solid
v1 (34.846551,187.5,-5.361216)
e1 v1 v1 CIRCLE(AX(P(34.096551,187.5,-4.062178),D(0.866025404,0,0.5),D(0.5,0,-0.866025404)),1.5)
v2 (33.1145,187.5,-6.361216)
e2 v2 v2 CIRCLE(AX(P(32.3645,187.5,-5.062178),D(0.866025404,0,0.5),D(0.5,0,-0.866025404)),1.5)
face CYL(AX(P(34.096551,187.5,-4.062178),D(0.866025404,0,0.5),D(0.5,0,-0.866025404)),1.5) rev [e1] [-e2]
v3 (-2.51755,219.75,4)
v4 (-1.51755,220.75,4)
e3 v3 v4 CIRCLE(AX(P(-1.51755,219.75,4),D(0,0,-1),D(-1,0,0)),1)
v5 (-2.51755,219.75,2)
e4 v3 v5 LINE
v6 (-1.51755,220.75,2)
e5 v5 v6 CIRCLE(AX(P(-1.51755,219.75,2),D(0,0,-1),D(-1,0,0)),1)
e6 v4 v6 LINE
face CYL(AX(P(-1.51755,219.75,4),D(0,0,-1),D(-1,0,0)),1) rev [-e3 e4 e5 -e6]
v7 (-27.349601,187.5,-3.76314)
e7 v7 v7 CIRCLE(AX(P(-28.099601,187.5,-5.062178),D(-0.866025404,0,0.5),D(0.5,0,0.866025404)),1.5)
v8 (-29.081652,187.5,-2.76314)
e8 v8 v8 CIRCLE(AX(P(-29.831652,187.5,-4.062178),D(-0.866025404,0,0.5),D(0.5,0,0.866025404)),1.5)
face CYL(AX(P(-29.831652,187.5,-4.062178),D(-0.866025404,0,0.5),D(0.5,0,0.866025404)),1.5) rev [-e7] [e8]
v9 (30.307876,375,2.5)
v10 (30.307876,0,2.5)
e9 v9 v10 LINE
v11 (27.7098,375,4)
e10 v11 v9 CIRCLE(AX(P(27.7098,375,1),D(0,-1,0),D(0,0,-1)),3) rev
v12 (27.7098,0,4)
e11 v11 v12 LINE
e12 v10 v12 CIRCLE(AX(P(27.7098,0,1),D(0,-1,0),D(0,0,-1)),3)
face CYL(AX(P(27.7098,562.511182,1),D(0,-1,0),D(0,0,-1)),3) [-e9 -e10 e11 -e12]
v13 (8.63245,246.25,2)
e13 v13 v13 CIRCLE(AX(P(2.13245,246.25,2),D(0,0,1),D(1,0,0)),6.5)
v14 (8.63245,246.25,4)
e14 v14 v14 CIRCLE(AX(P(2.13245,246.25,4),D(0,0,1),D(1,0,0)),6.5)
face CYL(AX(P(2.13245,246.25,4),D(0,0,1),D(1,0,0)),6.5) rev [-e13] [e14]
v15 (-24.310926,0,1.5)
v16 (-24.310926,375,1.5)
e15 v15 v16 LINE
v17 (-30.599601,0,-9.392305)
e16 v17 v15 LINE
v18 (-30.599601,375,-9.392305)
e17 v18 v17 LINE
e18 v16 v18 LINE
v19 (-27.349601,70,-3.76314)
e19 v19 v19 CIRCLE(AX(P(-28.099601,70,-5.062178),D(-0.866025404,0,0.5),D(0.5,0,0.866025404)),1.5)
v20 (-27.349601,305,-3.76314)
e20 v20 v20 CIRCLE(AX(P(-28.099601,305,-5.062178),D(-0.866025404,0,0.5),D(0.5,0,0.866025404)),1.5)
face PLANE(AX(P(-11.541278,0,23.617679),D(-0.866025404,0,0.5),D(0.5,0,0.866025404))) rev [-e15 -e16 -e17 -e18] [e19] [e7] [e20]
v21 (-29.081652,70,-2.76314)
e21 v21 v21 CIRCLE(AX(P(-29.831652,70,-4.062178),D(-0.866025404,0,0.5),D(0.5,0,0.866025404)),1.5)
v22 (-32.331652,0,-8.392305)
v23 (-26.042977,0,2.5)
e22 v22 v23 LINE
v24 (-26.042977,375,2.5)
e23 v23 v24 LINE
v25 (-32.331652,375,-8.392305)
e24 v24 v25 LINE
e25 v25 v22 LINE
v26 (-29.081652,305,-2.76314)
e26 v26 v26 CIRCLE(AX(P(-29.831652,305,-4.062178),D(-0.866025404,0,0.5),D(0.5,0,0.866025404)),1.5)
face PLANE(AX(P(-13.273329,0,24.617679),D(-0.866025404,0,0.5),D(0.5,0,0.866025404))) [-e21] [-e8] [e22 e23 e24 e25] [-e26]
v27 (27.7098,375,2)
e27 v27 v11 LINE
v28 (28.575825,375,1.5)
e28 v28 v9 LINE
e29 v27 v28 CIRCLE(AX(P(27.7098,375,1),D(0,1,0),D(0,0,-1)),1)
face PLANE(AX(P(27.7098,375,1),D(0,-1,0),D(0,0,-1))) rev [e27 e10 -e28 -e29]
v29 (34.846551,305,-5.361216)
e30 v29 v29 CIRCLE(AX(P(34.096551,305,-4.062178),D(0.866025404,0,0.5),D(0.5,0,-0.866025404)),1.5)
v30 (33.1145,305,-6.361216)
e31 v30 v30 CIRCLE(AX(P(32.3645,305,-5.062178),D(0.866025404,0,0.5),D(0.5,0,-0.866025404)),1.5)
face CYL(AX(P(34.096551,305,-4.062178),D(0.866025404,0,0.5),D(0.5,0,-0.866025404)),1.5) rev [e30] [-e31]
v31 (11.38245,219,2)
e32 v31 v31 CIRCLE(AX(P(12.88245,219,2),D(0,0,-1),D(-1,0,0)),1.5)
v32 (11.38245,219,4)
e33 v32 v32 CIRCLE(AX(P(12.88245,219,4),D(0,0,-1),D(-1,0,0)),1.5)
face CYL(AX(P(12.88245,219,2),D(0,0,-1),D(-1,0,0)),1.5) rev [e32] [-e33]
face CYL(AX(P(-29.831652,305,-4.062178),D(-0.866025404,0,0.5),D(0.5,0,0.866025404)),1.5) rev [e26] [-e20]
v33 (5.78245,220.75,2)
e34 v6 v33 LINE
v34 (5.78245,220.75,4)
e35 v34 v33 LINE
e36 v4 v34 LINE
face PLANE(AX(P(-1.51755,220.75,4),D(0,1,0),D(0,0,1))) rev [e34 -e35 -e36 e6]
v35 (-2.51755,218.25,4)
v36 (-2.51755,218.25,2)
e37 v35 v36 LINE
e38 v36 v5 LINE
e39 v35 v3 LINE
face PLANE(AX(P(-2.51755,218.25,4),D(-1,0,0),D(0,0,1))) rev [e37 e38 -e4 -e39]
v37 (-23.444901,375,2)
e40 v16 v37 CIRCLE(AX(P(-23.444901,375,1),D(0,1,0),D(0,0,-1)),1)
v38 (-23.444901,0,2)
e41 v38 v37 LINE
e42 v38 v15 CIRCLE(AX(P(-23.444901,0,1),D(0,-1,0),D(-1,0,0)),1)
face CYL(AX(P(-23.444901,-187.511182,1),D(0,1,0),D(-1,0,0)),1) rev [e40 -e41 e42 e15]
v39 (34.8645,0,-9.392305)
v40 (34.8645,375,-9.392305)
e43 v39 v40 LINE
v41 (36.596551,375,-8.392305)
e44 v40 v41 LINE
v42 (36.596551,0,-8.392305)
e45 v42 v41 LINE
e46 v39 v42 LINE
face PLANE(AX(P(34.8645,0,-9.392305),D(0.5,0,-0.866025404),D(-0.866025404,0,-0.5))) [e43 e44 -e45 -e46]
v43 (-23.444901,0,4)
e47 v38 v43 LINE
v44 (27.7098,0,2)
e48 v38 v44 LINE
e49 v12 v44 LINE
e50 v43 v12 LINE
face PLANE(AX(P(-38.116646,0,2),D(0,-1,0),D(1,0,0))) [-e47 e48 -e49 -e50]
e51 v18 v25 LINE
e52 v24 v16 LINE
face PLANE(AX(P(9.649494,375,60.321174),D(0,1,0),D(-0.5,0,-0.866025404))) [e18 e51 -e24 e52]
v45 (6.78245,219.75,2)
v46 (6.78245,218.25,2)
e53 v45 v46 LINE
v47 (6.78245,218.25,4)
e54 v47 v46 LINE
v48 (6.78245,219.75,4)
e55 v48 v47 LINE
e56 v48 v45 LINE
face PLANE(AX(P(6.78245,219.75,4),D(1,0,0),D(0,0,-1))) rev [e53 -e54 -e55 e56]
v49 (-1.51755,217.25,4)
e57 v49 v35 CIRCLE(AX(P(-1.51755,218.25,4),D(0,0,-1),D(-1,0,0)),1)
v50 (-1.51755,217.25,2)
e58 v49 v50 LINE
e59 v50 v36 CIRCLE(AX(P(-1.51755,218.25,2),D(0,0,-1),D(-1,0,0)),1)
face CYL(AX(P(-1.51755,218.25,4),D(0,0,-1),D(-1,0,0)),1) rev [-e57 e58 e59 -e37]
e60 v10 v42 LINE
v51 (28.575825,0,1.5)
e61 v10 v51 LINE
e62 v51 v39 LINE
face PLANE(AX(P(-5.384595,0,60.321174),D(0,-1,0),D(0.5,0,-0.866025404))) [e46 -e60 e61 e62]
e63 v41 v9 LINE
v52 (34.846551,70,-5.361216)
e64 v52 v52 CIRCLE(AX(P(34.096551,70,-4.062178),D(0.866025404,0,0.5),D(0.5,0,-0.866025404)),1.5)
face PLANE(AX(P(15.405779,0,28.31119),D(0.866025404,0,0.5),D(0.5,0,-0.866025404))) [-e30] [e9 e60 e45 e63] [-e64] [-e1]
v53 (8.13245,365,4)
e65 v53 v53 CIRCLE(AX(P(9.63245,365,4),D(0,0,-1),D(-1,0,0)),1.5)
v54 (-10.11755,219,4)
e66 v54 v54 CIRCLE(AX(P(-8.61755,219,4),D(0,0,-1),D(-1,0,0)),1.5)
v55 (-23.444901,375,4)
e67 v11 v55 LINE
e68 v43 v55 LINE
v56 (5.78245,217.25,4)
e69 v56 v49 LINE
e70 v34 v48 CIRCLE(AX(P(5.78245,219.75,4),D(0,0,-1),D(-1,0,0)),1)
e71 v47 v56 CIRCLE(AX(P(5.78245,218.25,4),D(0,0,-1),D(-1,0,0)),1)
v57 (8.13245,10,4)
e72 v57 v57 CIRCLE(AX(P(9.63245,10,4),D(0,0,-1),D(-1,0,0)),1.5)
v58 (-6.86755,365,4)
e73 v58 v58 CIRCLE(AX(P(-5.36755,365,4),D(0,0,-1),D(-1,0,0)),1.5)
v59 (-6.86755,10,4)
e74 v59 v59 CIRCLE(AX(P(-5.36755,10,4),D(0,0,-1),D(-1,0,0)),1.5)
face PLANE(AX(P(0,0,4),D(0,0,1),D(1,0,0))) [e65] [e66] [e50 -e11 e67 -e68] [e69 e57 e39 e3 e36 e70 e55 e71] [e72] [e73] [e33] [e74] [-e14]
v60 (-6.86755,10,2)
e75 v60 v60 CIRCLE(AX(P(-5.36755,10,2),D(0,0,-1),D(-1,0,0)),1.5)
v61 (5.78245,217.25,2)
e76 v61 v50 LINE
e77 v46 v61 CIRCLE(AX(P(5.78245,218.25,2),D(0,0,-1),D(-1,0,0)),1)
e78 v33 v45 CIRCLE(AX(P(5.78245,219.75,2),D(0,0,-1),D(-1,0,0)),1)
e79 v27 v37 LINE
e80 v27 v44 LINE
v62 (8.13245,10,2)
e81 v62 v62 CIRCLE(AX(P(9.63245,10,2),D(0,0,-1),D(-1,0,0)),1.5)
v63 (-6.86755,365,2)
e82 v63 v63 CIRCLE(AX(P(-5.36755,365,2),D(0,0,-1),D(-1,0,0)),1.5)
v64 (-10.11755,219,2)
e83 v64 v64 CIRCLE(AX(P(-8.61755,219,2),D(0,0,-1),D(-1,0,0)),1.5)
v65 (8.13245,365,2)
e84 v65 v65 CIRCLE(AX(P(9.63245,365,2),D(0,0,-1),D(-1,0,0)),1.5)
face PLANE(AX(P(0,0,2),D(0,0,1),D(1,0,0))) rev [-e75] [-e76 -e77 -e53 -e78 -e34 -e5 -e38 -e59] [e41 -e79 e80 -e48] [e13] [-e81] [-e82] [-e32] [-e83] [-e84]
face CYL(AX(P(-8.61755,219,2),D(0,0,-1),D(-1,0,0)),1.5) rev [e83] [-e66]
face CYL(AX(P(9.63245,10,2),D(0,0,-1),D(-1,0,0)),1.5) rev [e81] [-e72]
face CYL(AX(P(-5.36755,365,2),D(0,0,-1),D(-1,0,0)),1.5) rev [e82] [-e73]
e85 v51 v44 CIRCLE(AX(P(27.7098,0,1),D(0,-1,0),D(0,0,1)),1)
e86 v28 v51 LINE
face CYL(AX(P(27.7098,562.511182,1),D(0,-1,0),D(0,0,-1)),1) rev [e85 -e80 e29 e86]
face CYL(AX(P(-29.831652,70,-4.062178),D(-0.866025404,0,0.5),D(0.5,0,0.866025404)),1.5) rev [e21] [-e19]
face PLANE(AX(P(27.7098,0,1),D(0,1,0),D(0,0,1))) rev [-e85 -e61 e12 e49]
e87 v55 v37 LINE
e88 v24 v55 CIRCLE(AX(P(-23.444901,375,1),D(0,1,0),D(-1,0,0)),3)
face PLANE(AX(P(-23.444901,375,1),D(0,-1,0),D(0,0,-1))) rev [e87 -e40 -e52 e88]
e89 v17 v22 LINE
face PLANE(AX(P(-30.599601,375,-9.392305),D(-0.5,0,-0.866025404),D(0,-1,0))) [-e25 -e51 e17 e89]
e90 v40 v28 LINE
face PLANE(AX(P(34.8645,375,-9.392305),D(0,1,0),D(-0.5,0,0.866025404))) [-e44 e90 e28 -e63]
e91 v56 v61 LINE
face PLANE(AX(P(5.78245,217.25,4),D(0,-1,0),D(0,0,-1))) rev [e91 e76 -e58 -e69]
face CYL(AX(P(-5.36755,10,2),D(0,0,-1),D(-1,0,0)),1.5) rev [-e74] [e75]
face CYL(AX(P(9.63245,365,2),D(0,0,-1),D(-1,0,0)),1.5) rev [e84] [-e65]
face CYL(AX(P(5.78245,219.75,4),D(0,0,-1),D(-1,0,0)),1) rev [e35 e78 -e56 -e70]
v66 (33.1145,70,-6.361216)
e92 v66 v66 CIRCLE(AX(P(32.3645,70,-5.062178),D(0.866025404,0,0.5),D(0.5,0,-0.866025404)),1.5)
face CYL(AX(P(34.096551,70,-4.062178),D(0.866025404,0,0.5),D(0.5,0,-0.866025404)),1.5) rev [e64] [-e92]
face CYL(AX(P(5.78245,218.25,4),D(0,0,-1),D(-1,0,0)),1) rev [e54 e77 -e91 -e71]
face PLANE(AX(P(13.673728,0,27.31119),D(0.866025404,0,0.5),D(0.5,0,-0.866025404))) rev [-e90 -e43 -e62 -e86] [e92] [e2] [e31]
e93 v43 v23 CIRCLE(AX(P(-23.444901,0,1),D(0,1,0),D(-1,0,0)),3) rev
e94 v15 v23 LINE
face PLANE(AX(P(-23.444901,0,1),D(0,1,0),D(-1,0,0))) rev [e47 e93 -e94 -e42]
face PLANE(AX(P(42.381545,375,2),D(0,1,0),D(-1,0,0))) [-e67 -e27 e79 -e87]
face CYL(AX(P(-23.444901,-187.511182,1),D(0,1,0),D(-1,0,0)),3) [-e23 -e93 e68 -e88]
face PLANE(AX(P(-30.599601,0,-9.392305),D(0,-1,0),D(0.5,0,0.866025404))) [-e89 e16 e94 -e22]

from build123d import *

# Parameters (mm, degrees)
SKETCH_11_W             = 80.498191281
SKETCH_11_H             = 375
SM_BASE_FLANGE_1_DEPTH  = 2
CUT_EXTRUDE_1_DEPTH     = 378.392627604
HOLE_WIZARD_3_0_3_1_D   = 3
HOLE_WIZARD_3_0_3_2_D   = 3
HOLE_WIZARD_13_0_13_1_D = 13
OTHER_1_DEPTH           = 375
OTHER_1_2_DEPTH         = 375
OTHER_START             = -25
OTHER_1_3_OUTLINE_R     = 1.5
OTHER_1_3_DEPTH         = 4
OTHER_START_2           = 33.158957521
OTHER_3_OUTLINE_R       = 1.5
OTHER_3_DEPTH           = 6.841042479
OTHER_3_2_DEPTH         = 375
OTHER_3_3_DEPTH         = 375
OTHER_START_3           = 24
OTHER_3_4_OUTLINE_R     = 1.5
OTHER_3_4_DEPTH         = 4


with BuildPart() as part:
    # 基材-凸緣1: sheet metal written as solids
    # 草圖11 → 基材-凸緣1 (new body)
    with BuildSketch(Plane.XY.offset(4)):
        with Locations((2.132449513, 187.5)):
            Rectangle(SKETCH_11_W, SKETCH_11_H)
    extrude(amount=-SM_BASE_FLANGE_1_DEPTH)

    # 草圖16 → 除料-伸長1 (cut, through all)
    with BuildSketch(Plane(origin=(0, 0, 2), x_dir=(-1, 0, 0), z_dir=(0, 0, -1))):
        with BuildLine():
            Line((1.517550486, 220.75), (-5.782449514, 220.75))
            ThreePointArc((-5.782449514, 220.75), (-6.489556295, 220.457106781), (-6.782449514, 219.75))
            Line((-6.782449514, 219.75), (-6.782449514, 218.25))
            ThreePointArc((-6.782449514, 218.25), (-6.489556295, 217.542893219), (-5.782449514, 217.25))
            Line((-5.782449514, 217.25), (1.517550486, 217.25))
            ThreePointArc((1.517550486, 217.25), (2.224657268, 217.542893219), (2.517550486, 218.25))
            Line((2.517550486, 218.25), (2.517550486, 219.75))
            ThreePointArc((2.517550486, 219.75), (2.224657268, 220.457106781), (1.517550486, 220.75))
        make_face()
    extrude(amount=-CUT_EXTRUDE_1_DEPTH, mode=Mode.SUBTRACT)

    # Ø3.0 (3) 直徑孔1 (through all)
    with Locations(Plane.XY.offset(4)):
        with Locations((37.381545154, 70), (37.381545154, 187.5), (37.381545154, 305), (-33.116646127, 70), (-33.116646127, 187.5), (-33.116646127, 305)):
            Hole(HOLE_WIZARD_3_0_3_1_D / 2)

    # Ø3.0 (3) 直徑孔2 (through all)
    with Locations(Plane(origin=(0, 0, 2), x_dir=(-1, 0, 0), z_dir=(0, 0, -1))):
        with Locations((-12.882449514, 219), (8.617550486, 219), (5.367550486, 10), (-9.632449514, 10), (-9.632449514, 365), (5.367550486, 365)):
            Hole(HOLE_WIZARD_3_0_3_2_D / 2)

    # Ø13.0 (13) 直徑孔1 (through all)
    with Locations(Plane.XY.offset(4)):
        with Locations((2.132449514, 246.25)):
            Hole(HOLE_WIZARD_13_0_13_1_D / 2)

    # Other 1: read off the stored shape, not the designer's step
    # Other 1 outline → Other 1 (cut)
    with BuildSketch(Plane(origin=(0, 0, 0), x_dir=(1, 0, 0), z_dir=(0, 1, 0))):
        with BuildLine():
            Line((-26.042976967, -2.5), (-26.331652102, -2))
            Line((-26.331652102, -2), (-38.116646127, -2))
            Line((-38.116646127, -2), (-38.116646127, -4))
            Line((-38.116646127, -4), (-23.444900756, -4))
            ThreePointArc((-23.444900756, -4), (-24.944900756, -3.598076211), (-26.042976967, -2.5))
        make_face()
    extrude(amount=OTHER_1_DEPTH, mode=Mode.SUBTRACT)

    # Other 1 2 outline → Other 1 2 (add)
    with BuildSketch(Plane(origin=(0, 0, 0), x_dir=(1, 0, 0), z_dir=(0, 1, 0))):
        with BuildLine():
            Line((-30.599601294, 9.392304845), (-32.331652102, 8.392304845))
            Line((-32.331652102, 8.392304845), (-26.331652102, -2))
            Line((-26.331652102, -2), (-23.444900756, -2))
            ThreePointArc((-23.444900756, -2), (-23.944900756, -1.866025404), (-24.310926159, -1.5))
            Line((-24.310926159, -1.5), (-30.599601294, 9.392304845))
        make_face()
    extrude(amount=OTHER_1_2_DEPTH)

    # Other 1 3 outline → Other 1 3 (cut)
    with BuildSketch(Plane(origin=(0, 0, 0), x_dir=(0.4999999999999988, 0, 0.8660254037844395), z_dir=(0.8660254037844393, 0, -0.4999999999999991)).offset(OTHER_START)):
        with Locations((-18.433775243, -305)):
            Circle(OTHER_1_3_OUTLINE_R)
        with Locations((-18.433775243, -187.5)):
            Circle(OTHER_1_3_OUTLINE_R)
        with Locations((-18.433775243, -70)):
            Circle(OTHER_1_3_OUTLINE_R)
    extrude(amount=OTHER_1_3_DEPTH, mode=Mode.SUBTRACT)

    # Other 3: read off the stored shape, not the designer's step
    # Other 3 outline → Other 3 (cut)
    with BuildSketch(Plane(origin=(0, 0, 0), x_dir=(0.500000000000006, 0, -0.8660254037844353), z_dir=(0.8660254037844352, 0, 0.5000000000000061)).offset(OTHER_START_2)):
        with Locations((20.566224757, 70)):
            Circle(OTHER_3_OUTLINE_R)
        with Locations((20.566224757, 187.5)):
            Circle(OTHER_3_OUTLINE_R)
        with Locations((20.566224757, 305)):
            Circle(OTHER_3_OUTLINE_R)
    extrude(amount=OTHER_3_DEPTH, mode=Mode.SUBTRACT)

    # Other 3 2 outline → Other 3 2 (cut)
    with BuildSketch(Plane(origin=(0, 0, 0), x_dir=(1, 0, 0), z_dir=(0, 1, 0))):
        with BuildLine():
            Line((42.381545154, -2), (30.596551129, -2))
            Line((30.596551129, -2), (30.307875994, -2.5))
            ThreePointArc((30.307875994, -2.5), (29.209799783, -3.598076211), (27.709799783, -4))
            Line((27.709799783, -4), (42.381545154, -4))
            Line((42.381545154, -4), (42.381545154, -2))
        make_face()
    extrude(amount=OTHER_3_2_DEPTH, mode=Mode.SUBTRACT)

    # Other 3 3 outline → Other 3 3 (add)
    with BuildSketch(Plane(origin=(0, 0, 0), x_dir=(1, 0, 0), z_dir=(0, 1, 0))):
        with BuildLine():
            Line((34.864500321, 9.392304845), (28.575825186, -1.5))
            ThreePointArc((28.575825186, -1.5), (28.209799783, -1.866025404), (27.709799783, -2))
            Line((27.709799783, -2), (30.596551129, -2))
            Line((30.596551129, -2), (36.596551129, 8.392304845))
            Line((36.596551129, 8.392304845), (34.864500321, 9.392304845))
        make_face()
    extrude(amount=OTHER_3_3_DEPTH)

    # Other 3 4 outline → Other 3 4 (cut)
    with BuildSketch(Plane(origin=(0, 0, 0), x_dir=(0.500000000000006, 0, -0.8660254037844353), z_dir=(0.8660254037844352, 0, 0.5000000000000061)).offset(OTHER_START_3)):
        with Locations((20.566224757, 70)):
            Circle(OTHER_3_4_OUTLINE_R)
        with Locations((20.566224757, 187.5)):
            Circle(OTHER_3_4_OUTLINE_R)
        with Locations((20.566224757, 305)):
            Circle(OTHER_3_4_OUTLINE_R)
    extrude(amount=OTHER_3_4_DEPTH, mode=Mode.SUBTRACT)


solid = part.part
